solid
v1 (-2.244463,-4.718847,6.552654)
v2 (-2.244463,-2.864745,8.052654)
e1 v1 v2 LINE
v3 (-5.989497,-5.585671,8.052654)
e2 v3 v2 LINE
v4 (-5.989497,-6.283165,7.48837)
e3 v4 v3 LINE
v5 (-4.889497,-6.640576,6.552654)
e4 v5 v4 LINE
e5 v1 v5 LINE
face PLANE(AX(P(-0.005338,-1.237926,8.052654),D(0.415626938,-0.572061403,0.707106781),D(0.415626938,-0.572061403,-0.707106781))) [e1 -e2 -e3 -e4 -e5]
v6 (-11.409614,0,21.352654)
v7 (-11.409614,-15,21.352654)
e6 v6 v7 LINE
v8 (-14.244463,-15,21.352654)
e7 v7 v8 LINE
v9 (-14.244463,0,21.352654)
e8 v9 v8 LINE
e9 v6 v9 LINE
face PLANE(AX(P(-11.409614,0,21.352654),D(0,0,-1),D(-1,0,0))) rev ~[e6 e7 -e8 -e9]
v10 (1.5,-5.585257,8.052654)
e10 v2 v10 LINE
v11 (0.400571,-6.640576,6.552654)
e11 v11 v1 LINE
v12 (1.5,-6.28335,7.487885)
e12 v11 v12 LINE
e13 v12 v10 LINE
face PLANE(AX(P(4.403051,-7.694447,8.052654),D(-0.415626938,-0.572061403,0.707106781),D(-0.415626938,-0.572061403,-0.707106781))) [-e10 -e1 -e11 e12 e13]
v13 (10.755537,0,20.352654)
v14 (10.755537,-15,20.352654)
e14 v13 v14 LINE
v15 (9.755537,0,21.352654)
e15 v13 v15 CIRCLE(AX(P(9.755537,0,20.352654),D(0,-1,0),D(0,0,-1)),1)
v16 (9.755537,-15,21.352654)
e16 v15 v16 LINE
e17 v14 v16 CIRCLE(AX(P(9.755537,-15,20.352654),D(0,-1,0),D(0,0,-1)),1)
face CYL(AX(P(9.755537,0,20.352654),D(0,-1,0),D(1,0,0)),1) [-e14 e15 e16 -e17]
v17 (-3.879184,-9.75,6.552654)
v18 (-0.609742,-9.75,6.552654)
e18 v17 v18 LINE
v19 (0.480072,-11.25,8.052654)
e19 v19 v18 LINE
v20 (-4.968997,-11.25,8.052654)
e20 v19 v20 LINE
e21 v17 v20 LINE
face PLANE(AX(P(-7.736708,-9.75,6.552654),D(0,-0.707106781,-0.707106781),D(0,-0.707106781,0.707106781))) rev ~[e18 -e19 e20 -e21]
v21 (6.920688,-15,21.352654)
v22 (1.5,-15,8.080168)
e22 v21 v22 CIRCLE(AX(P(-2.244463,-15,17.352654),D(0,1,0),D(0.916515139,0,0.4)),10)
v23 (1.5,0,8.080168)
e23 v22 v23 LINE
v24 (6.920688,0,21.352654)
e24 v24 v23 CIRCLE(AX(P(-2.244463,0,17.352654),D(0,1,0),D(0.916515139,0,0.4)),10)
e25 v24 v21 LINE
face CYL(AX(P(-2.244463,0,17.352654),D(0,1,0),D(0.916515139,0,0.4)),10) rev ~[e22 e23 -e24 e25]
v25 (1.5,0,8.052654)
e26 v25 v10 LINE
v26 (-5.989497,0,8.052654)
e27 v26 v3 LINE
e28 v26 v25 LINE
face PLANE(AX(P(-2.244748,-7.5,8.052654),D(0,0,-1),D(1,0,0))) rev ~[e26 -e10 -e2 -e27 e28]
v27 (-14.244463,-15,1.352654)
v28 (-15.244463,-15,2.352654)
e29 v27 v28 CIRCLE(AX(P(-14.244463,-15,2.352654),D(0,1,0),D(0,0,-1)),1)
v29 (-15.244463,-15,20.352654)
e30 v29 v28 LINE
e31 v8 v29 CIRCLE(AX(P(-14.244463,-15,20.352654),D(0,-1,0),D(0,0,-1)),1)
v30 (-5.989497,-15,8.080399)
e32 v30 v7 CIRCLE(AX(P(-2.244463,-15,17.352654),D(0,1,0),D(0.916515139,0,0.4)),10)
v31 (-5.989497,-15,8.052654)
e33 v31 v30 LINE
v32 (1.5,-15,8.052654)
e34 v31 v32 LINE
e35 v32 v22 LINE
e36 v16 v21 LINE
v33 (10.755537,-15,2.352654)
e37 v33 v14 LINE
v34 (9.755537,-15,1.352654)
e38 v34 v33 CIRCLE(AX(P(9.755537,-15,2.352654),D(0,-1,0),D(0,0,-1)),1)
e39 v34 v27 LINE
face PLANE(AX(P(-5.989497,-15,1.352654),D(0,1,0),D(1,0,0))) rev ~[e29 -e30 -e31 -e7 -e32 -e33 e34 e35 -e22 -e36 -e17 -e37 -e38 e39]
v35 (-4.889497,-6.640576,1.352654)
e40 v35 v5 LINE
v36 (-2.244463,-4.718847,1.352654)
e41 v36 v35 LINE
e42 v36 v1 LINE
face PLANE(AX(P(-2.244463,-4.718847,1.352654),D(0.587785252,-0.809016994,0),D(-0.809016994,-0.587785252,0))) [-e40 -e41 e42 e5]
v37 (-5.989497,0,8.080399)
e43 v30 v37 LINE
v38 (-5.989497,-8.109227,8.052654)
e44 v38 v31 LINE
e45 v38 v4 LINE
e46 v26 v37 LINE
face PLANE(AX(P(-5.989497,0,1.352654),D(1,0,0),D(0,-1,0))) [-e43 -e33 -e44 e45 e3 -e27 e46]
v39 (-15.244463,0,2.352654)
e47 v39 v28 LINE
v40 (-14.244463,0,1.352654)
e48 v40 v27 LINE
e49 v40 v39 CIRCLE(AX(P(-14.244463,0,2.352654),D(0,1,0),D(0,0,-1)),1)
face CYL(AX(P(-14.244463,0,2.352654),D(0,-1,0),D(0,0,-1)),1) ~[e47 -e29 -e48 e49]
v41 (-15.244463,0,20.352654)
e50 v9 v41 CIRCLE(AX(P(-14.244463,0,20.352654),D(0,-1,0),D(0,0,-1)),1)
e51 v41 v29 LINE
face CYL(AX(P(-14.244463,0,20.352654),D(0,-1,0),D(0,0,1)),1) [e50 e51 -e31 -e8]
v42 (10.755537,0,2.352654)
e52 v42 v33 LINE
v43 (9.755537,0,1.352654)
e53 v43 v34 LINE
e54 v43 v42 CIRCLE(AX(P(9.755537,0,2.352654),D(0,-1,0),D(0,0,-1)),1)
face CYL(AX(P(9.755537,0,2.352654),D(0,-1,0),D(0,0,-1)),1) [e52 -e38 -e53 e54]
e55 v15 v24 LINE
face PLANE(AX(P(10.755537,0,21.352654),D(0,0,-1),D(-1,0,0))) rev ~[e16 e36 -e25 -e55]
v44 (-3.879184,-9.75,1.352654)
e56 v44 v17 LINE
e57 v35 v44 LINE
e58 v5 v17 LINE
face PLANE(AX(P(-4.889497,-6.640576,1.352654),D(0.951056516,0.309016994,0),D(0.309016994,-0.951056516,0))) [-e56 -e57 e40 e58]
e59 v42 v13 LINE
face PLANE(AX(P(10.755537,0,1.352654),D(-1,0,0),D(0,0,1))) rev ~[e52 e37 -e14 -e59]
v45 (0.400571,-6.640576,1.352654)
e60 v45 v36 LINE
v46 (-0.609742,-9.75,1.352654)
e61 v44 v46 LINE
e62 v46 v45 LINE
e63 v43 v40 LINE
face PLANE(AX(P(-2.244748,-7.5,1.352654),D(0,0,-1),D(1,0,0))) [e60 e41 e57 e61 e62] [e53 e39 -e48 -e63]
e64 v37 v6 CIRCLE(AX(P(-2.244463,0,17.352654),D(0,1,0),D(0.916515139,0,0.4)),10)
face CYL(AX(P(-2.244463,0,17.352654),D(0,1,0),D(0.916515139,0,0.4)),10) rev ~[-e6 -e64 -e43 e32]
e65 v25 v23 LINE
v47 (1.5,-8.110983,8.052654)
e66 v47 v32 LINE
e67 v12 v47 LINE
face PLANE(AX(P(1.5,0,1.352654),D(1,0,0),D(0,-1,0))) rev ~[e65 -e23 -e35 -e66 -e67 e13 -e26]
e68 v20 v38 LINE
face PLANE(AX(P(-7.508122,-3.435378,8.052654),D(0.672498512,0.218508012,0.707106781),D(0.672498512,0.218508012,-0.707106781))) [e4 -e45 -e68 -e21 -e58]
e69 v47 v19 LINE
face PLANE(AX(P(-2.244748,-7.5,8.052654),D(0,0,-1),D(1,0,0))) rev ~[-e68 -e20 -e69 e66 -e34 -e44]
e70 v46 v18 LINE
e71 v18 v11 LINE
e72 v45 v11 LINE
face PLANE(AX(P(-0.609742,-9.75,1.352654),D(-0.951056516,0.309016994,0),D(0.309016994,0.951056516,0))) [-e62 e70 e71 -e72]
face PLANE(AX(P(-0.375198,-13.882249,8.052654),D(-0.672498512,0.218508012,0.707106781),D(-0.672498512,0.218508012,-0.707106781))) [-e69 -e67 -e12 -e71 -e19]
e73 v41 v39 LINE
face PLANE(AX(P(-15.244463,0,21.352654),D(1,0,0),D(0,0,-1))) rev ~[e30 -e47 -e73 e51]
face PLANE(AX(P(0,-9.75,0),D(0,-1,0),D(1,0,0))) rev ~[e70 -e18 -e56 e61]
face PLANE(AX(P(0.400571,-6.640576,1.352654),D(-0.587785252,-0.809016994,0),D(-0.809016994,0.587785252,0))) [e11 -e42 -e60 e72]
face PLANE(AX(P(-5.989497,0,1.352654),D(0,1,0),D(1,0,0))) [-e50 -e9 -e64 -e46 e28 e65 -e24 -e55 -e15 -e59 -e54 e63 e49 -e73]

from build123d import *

# Parameters (mm, degrees)
F1_DEPTH     = 15
F3_DEPTH     = 8
F4_W         = 7.4894965633
F4_H         = 15
F5_DEPTH     = 8
F6_DEPTH     = 6.7
F7_T4_DEPTH  = 10.9844903399
F7_T10_DEPTH = 10.9844903399
F7_T16_DEPTH = 10.9844903399
F7_T23_DEPTH = 10.9844903399
F7_T29_DEPTH = 10.9844903399
F7_T37_DEPTH = 10.9844903399
F7_T41_DEPTH = 10.9844903399
F7_T48_DEPTH = 10.9844903399
F7_T53_DEPTH = 10.9844903399
F7_T61_DEPTH = 10.9844903399
F7_T66_DEPTH = 10.9844903399
F7_T74_DEPTH = 10.9844903399
F7_T79_DEPTH = 10.9844903399
F7_T86_DEPTH = 10.9844903399
F7_T91_DEPTH = 10.9844903399
F8_R         = 1


# Not quite as in the source:
# - a fillet or chamfer that OpenCascade refuses, or shapes differently, is made with other operations: its cross-section is extruded or revolved along the edge and cut away or added
# - a feature names something its author has since deleted; it is built from what else it names


with BuildPart() as f1:
    # F0 (on Front) → F1 (new body)
    with BuildSketch(Plane.XZ):
        with BuildLine():
            Line((-11.4096143179, 21.3526541356), (-15.244462928, 21.3526541356))
            Line((-15.244462928, 21.3526541356), (-15.244462928, 1.3526541356))
            Line((-15.244462928, 1.3526541356), (10.755537072, 1.3526541356))
            Line((10.755537072, 1.3526541356), (10.755537072, 21.3526541356))
            Line((10.755537072, 21.3526541356), (6.9206884619, 21.3526541356))
            ThreePointArc((6.9206884619, 21.3526541356), (-2.244462928, 7.3526541356), (-11.4096143179, 21.3526541356))
        make_face()
    extrude(amount=F1_DEPTH)

    # F2 (on face) → F3 (cut)
    with BuildSketch(Plane(origin=(0, 0, 1.3526541356), x_dir=(1, 0, 0), z_dir=(0, 0, -1))):
        Polygon((-0.60974224, 9.75), (-3.879183616, 9.75), (-4.8894965633, 6.6405764747), (-2.244462928, 4.7188470506), (0.4005707074, 6.6405764747), align=None)
    extrude(amount=-F3_DEPTH, mode=Mode.SUBTRACT)

    # F4 (on face) → F5 (cut)
    with BuildSketch(Plane(origin=(0, 0, 1.3526541356), x_dir=(1, 0, 0), z_dir=(0, 0, -1))):
        with Locations((-2.2447482816, 7.5)):
            Rectangle(F4_W, F4_H)
        Polygon((0.4005707074, 6.6405764747), (-2.244462928, 4.7188470506), (-4.8894965633, 6.6405764747), (-3.879183616, 9.75), (-0.60974224, 9.75), align=None, mode=Mode.SUBTRACT)
    extrude(amount=-F5_DEPTH, mode=Mode.SUBTRACT)

    # F4 (on face) → F6 (join)
    with BuildSketch(Plane(origin=(0, 0, 1.3526541356), x_dir=(1, 0, 0), z_dir=(0, 0, -1))):
        with Locations((-2.2447482816, 7.5)):
            Rectangle(F4_W, F4_H)
        Polygon((0.4005707074, 6.6405764747), (-2.244462928, 4.7188470506), (-4.8894965633, 6.6405764747), (-3.879183616, 9.75), (-0.60974224, 9.75), align=None, mode=Mode.SUBTRACT)
    extrude(amount=-F6_DEPTH)

    # F7: chamfer of 1.5 on 5 edges, made by hand


with BuildPart() as f7_tool2:
    # F7_s3 → F7_t4 (new body)
    with BuildSketch(Plane(origin=(-0.5921623143, -0.4302311048, 0), x_dir=(0, 0, 1), z_dir=(-0.8090169944, -0.5877852523, 0))):
        Polygon((8.0526541356, -0.9983652494), (6.5526541356, -2.4983652494), (8.0526541356, -2.4983652494), align=None)
    extrude(amount=F7_T4_DEPTH)

    split(bisect_by=Plane(origin=(-3.0193879884, -4.1558310382, 0), x_dir=(0, 0, 1), z_dir=(-0.5877852523, -0.8090169944, 0)), keep=Keep.TOP)

    split(bisect_by=Plane(origin=(-6.3742076477, -2.0711056126, 0), x_dir=(0, 0, 1), z_dir=(0.9510565163, 0.3090169944, 0)), keep=Keep.TOP)


with BuildPart() as f1_1:
    add(f1.part)

    # F7_t1: cut F7_tool2
    add(f7_tool2.part, mode=Mode.SUBTRACT)


with BuildPart() as f7_tool8:
    # F7_s9 → F7_t10 (new body)
    with BuildSketch(Plane(origin=(6.5407615579, -4.7521414374, 0), x_dir=(0, 0, 1), z_dir=(-0.8090169944, 0.5877852523, 0))):
        Polygon((8.0526541356, -3.6368896662), (6.5526541356, -5.1368896662), (8.0526541356, -5.1368896662), align=None)
    extrude(amount=F7_T10_DEPTH)

    split(bisect_by=Plane(origin=(2.3139360678, -0.7518434043, 0), x_dir=(0, 0, 1), z_dir=(-0.9510565163, 0.3090169944, 0)), keep=Keep.TOP)

    split(bisect_by=Plane(origin=(1.4685022485, -2.021219945, 0), x_dir=(0, 0, 1), z_dir=(0.5877852523, -0.8090169944, 0)), keep=Keep.TOP)


with BuildPart() as f1_2:
    add(f1_1.part)

    # F7_t7: cut F7_tool8
    add(f7_tool8.part, mode=Mode.SUBTRACT)


with BuildPart() as f7_tool14:
    # F7_s15 → F7_t16 (new body)
    with BuildSketch(Plane(origin=(-4.1157189289, -12.6668803911, 0), x_dir=(0, 0, 1), z_dir=(0.3090169944, 0.9510565163, 0))):
        Polygon((8.0526541356, 3.9330163646), (6.5526541356, 2.4330163646), (8.0526541356, 2.4330163646), align=None)
    extrude(amount=F7_T16_DEPTH)

    split(bisect_by=Plane.XZ.offset(9.75), keep=Keep.BOTTOM)

    split(bisect_by=Plane(origin=(-3.0193879884, -4.1558310382, 0), x_dir=(0, 0, 1), z_dir=(-0.5877852523, -0.8090169944, 0)), keep=Keep.TOP)

    split(bisect_by=Plane.YZ.offset(1.5), keep=Keep.BOTTOM)


with BuildPart() as f1_3:
    add(f1_2.part)

    # F7_t13: cut F7_tool14
    add(f7_tool14.part, mode=Mode.SUBTRACT)


with BuildPart() as f7_tool21:
    # F7_s22 → F7_t23 (new body)
    with BuildSketch(Plane.YZ.offset(-7.7367080979)):
        Polygon((-9.75, 6.5526541356), (-11.25, 8.0526541356), (-9.75, 8.0526541356), align=None)
    extrude(amount=F7_T23_DEPTH)

    split(bisect_by=Plane(origin=(2.3139360678, -0.7518434043, 0), x_dir=(0, 0, 1), z_dir=(-0.9510565163, 0.3090169944, 0)), keep=Keep.TOP)

    split(bisect_by=Plane(origin=(-6.3742076477, -2.0711056126, 0), x_dir=(0, 0, 1), z_dir=(0.9510565163, 0.3090169944, 0)), keep=Keep.TOP)


with BuildPart() as f1_4:
    add(f1_3.part)

    # F7_t20: cut F7_tool21
    add(f7_tool21.part, mode=Mode.SUBTRACT)


with BuildPart() as f7_tool27:
    # F7_s28 → F7_t29 (new body)
    with BuildSketch(Plane(origin=(0.2926704633, -0.9007470667, 0), x_dir=(0, 0, 1), z_dir=(0.3090169944, -0.9510565163, 0))):
        Polygon((8.0526541356, 8.202238551), (6.5526541356, 6.702238551), (8.0526541356, 6.702238551), align=None)
    extrude(amount=F7_T29_DEPTH)

    split(bisect_by=Plane.XZ.offset(9.75), keep=Keep.BOTTOM)

    split(bisect_by=Plane.YZ.offset(-5.9894965633), keep=Keep.TOP)

    split(bisect_by=Plane(origin=(1.4685022485, -2.021219945, 0), x_dir=(0, 0, 1), z_dir=(0.5877852523, -0.8090169944, 0)), keep=Keep.TOP)


with BuildPart() as f1_5:
    add(f1_4.part)

    # F7_t26: cut F7_tool27
    add(f7_tool27.part, mode=Mode.SUBTRACT)


with BuildPart() as f7_tool35:
    # F7_s36 → F7_t37 (new body)
    with BuildSketch(Plane(origin=(6.5407615579, -4.7521414374, 0), x_dir=(0, 0, 1), z_dir=(-0.8090169944, 0.5877852523, 0))):
        Polygon((8.0526541356, -3.6368896662), (6.5526541356, -5.1368896662), (8.0526541356, -5.1368896662), align=None)
    extrude(amount=F7_T37_DEPTH)

    split(bisect_by=Plane(origin=(1.4685022485, -2.021219945, 0), x_dir=(0, 0, 1), z_dir=(-0.5877852523, 0.8090169944, 0)), keep=Keep.TOP)


with BuildPart() as f7_tool39:
    # F7_s40 → F7_t41 (new body)
    with BuildSketch(Plane(origin=(-0.5921623143, -0.4302311048, 0), x_dir=(0, 0, 1), z_dir=(-0.8090169944, -0.5877852523, 0))):
        Polygon((8.0526541356, -0.9983652494), (6.5526541356, -2.4983652494), (8.0526541356, -2.4983652494), align=None)
    extrude(amount=F7_T41_DEPTH)

    split(bisect_by=Plane(origin=(-3.0193879884, -4.1558310382, 0), x_dir=(0, 0, 1), z_dir=(0.5877852523, 0.8090169944, 0)), keep=Keep.TOP)


with BuildPart() as f7_tool35_1:
    add(f7_tool35.part)

    # F7_t43: intersect F7_tool39
    add(f7_tool39.part, mode=Mode.INTERSECT)


with BuildPart() as f1_6:
    add(f1_5.part)

    # F7_t33: cut F7_tool35
    add(f7_tool35_1.part, mode=Mode.SUBTRACT)


with BuildPart() as f7_tool46:
    # F7_s47 → F7_t48 (new body)
    with BuildSketch(Plane(origin=(-0.5921623143, -0.4302311048, 0), x_dir=(0, 0, 1), z_dir=(-0.8090169944, -0.5877852523, 0))):
        Polygon((8.0526541356, -0.9983652494), (6.5526541356, -2.4983652494), (8.0526541356, -2.4983652494), align=None)
    extrude(amount=F7_T48_DEPTH)

    split(bisect_by=Plane.YZ.offset(-5.9894965633), keep=Keep.TOP)

    split(bisect_by=Plane(origin=(-6.3742076477, -2.0711056126, 0), x_dir=(0, 0, 1), z_dir=(-0.9510565163, -0.3090169944, 0)), keep=Keep.TOP)


with BuildPart() as f7_tool51:
    # F7_s52 → F7_t53 (new body)
    with BuildSketch(Plane(origin=(0.2926704633, -0.9007470667, 0), x_dir=(0, 0, 1), z_dir=(0.3090169944, -0.9510565163, 0))):
        Polygon((8.0526541356, 8.202238551), (6.5526541356, 6.702238551), (8.0526541356, 6.702238551), align=None)
    extrude(amount=F7_T53_DEPTH)

    split(bisect_by=Plane.YZ.offset(-5.9894965633), keep=Keep.TOP)

    split(bisect_by=Plane(origin=(1.4685022485, -2.021219945, 0), x_dir=(0, 0, 1), z_dir=(-0.5877852523, 0.8090169944, 0)), keep=Keep.TOP)


with BuildPart() as f7_tool46_1:
    add(f7_tool46.part)

    # F7_t56: intersect F7_tool51
    add(f7_tool51.part, mode=Mode.INTERSECT)


with BuildPart() as f1_7:
    add(f1_6.part)

    # F7_t44: cut F7_tool46
    add(f7_tool46_1.part, mode=Mode.SUBTRACT)


with BuildPart() as f7_tool59:
    # F7_s60 → F7_t61 (new body)
    with BuildSketch(Plane(origin=(-4.1157189289, -12.6668803911, 0), x_dir=(0, 0, 1), z_dir=(0.3090169944, 0.9510565163, 0))):
        Polygon((8.0526541356, 3.9330163646), (6.5526541356, 2.4330163646), (8.0526541356, 2.4330163646), align=None)
    extrude(amount=F7_T61_DEPTH)

    split(bisect_by=Plane(origin=(-3.0193879884, -4.1558310382, 0), x_dir=(0, 0, 1), z_dir=(0.5877852523, 0.8090169944, 0)), keep=Keep.TOP)

    split(bisect_by=Plane.YZ.offset(1.5), keep=Keep.BOTTOM)


with BuildPart() as f7_tool64:
    # F7_s65 → F7_t66 (new body)
    with BuildSketch(Plane(origin=(6.5407615579, -4.7521414374, 0), x_dir=(0, 0, 1), z_dir=(-0.8090169944, 0.5877852523, 0))):
        Polygon((8.0526541356, -3.6368896662), (6.5526541356, -5.1368896662), (8.0526541356, -5.1368896662), align=None)
    extrude(amount=F7_T66_DEPTH)

    split(bisect_by=Plane(origin=(2.3139360678, -0.7518434043, 0), x_dir=(0, 0, 1), z_dir=(0.9510565163, -0.3090169944, 0)), keep=Keep.TOP)

    split(bisect_by=Plane.YZ.offset(1.5), keep=Keep.BOTTOM)


with BuildPart() as f7_tool59_1:
    add(f7_tool59.part)

    # F7_t69: intersect F7_tool64
    add(f7_tool64.part, mode=Mode.INTERSECT)


with BuildPart() as f1_8:
    add(f1_7.part)

    # F7_t57: cut F7_tool59
    add(f7_tool59_1.part, mode=Mode.SUBTRACT)


with BuildPart() as f7_tool72:
    # F7_s73 → F7_t74 (new body)
    with BuildSketch(Plane.YZ.offset(-7.7367080979)):
        Polygon((-9.75, 6.5526541356), (-11.25, 8.0526541356), (-9.75, 8.0526541356), align=None)
    extrude(amount=F7_T74_DEPTH)

    split(bisect_by=Plane(origin=(2.3139360678, -0.7518434043, 0), x_dir=(0, 0, 1), z_dir=(0.9510565163, -0.3090169944, 0)), keep=Keep.TOP)

    split(bisect_by=Plane.YZ.offset(1.5), keep=Keep.BOTTOM)


with BuildPart() as f7_tool77:
    # F7_s78 → F7_t79 (new body)
    with BuildSketch(Plane(origin=(-4.1157189289, -12.6668803911, 0), x_dir=(0, 0, 1), z_dir=(0.3090169944, 0.9510565163, 0))):
        Polygon((8.0526541356, 3.9330163646), (6.5526541356, 2.4330163646), (8.0526541356, 2.4330163646), align=None)
    extrude(amount=F7_T79_DEPTH)

    split(bisect_by=Plane.XZ.offset(9.75), keep=Keep.TOP)


with BuildPart() as f7_tool72_1:
    add(f7_tool72.part)

    # F7_t81: intersect F7_tool77
    add(f7_tool77.part, mode=Mode.INTERSECT)


with BuildPart() as f1_9:
    add(f1_8.part)

    # F7_t70: cut F7_tool72
    add(f7_tool72_1.part, mode=Mode.SUBTRACT)


with BuildPart() as f7_tool84:
    # F7_s85 → F7_t86 (new body)
    with BuildSketch(Plane.YZ.offset(-7.7367080979)):
        Polygon((-9.75, 6.5526541356), (-11.25, 8.0526541356), (-9.75, 8.0526541356), align=None)
    extrude(amount=F7_T86_DEPTH)

    split(bisect_by=Plane.YZ.offset(-5.9894965633), keep=Keep.TOP)

    split(bisect_by=Plane(origin=(-6.3742076477, -2.0711056126, 0), x_dir=(0, 0, 1), z_dir=(-0.9510565163, -0.3090169944, 0)), keep=Keep.TOP)


with BuildPart() as f7_tool89:
    # F7_s90 → F7_t91 (new body)
    with BuildSketch(Plane(origin=(0.2926704633, -0.9007470667, 0), x_dir=(0, 0, 1), z_dir=(0.3090169944, -0.9510565163, 0))):
        Polygon((8.0526541356, 8.202238551), (6.5526541356, 6.702238551), (8.0526541356, 6.702238551), align=None)
    extrude(amount=F7_T91_DEPTH)

    split(bisect_by=Plane.XZ.offset(9.75), keep=Keep.TOP)


with BuildPart() as f7_tool84_1:
    add(f7_tool84.part)

    # F7_t93: intersect F7_tool89
    add(f7_tool89.part, mode=Mode.INTERSECT)


with BuildPart() as f1_10:
    add(f1_9.part)

    # F7_t82: cut F7_tool84
    add(f7_tool84_1.part, mode=Mode.SUBTRACT)

    # F8
    f8_edges = [f1_10.edges().sort_by_distance(p)[0] for p in [
        (-15.244463, -7.5, 21.352654),
        (10.755537, -7.5, 21.352654),
        (10.755537, -7.5, 1.352654),
        (-15.244463, -7.5, 1.352654),
    ]]
    fillet(f8_edges, radius=F8_R)


solid = f1_10.part
